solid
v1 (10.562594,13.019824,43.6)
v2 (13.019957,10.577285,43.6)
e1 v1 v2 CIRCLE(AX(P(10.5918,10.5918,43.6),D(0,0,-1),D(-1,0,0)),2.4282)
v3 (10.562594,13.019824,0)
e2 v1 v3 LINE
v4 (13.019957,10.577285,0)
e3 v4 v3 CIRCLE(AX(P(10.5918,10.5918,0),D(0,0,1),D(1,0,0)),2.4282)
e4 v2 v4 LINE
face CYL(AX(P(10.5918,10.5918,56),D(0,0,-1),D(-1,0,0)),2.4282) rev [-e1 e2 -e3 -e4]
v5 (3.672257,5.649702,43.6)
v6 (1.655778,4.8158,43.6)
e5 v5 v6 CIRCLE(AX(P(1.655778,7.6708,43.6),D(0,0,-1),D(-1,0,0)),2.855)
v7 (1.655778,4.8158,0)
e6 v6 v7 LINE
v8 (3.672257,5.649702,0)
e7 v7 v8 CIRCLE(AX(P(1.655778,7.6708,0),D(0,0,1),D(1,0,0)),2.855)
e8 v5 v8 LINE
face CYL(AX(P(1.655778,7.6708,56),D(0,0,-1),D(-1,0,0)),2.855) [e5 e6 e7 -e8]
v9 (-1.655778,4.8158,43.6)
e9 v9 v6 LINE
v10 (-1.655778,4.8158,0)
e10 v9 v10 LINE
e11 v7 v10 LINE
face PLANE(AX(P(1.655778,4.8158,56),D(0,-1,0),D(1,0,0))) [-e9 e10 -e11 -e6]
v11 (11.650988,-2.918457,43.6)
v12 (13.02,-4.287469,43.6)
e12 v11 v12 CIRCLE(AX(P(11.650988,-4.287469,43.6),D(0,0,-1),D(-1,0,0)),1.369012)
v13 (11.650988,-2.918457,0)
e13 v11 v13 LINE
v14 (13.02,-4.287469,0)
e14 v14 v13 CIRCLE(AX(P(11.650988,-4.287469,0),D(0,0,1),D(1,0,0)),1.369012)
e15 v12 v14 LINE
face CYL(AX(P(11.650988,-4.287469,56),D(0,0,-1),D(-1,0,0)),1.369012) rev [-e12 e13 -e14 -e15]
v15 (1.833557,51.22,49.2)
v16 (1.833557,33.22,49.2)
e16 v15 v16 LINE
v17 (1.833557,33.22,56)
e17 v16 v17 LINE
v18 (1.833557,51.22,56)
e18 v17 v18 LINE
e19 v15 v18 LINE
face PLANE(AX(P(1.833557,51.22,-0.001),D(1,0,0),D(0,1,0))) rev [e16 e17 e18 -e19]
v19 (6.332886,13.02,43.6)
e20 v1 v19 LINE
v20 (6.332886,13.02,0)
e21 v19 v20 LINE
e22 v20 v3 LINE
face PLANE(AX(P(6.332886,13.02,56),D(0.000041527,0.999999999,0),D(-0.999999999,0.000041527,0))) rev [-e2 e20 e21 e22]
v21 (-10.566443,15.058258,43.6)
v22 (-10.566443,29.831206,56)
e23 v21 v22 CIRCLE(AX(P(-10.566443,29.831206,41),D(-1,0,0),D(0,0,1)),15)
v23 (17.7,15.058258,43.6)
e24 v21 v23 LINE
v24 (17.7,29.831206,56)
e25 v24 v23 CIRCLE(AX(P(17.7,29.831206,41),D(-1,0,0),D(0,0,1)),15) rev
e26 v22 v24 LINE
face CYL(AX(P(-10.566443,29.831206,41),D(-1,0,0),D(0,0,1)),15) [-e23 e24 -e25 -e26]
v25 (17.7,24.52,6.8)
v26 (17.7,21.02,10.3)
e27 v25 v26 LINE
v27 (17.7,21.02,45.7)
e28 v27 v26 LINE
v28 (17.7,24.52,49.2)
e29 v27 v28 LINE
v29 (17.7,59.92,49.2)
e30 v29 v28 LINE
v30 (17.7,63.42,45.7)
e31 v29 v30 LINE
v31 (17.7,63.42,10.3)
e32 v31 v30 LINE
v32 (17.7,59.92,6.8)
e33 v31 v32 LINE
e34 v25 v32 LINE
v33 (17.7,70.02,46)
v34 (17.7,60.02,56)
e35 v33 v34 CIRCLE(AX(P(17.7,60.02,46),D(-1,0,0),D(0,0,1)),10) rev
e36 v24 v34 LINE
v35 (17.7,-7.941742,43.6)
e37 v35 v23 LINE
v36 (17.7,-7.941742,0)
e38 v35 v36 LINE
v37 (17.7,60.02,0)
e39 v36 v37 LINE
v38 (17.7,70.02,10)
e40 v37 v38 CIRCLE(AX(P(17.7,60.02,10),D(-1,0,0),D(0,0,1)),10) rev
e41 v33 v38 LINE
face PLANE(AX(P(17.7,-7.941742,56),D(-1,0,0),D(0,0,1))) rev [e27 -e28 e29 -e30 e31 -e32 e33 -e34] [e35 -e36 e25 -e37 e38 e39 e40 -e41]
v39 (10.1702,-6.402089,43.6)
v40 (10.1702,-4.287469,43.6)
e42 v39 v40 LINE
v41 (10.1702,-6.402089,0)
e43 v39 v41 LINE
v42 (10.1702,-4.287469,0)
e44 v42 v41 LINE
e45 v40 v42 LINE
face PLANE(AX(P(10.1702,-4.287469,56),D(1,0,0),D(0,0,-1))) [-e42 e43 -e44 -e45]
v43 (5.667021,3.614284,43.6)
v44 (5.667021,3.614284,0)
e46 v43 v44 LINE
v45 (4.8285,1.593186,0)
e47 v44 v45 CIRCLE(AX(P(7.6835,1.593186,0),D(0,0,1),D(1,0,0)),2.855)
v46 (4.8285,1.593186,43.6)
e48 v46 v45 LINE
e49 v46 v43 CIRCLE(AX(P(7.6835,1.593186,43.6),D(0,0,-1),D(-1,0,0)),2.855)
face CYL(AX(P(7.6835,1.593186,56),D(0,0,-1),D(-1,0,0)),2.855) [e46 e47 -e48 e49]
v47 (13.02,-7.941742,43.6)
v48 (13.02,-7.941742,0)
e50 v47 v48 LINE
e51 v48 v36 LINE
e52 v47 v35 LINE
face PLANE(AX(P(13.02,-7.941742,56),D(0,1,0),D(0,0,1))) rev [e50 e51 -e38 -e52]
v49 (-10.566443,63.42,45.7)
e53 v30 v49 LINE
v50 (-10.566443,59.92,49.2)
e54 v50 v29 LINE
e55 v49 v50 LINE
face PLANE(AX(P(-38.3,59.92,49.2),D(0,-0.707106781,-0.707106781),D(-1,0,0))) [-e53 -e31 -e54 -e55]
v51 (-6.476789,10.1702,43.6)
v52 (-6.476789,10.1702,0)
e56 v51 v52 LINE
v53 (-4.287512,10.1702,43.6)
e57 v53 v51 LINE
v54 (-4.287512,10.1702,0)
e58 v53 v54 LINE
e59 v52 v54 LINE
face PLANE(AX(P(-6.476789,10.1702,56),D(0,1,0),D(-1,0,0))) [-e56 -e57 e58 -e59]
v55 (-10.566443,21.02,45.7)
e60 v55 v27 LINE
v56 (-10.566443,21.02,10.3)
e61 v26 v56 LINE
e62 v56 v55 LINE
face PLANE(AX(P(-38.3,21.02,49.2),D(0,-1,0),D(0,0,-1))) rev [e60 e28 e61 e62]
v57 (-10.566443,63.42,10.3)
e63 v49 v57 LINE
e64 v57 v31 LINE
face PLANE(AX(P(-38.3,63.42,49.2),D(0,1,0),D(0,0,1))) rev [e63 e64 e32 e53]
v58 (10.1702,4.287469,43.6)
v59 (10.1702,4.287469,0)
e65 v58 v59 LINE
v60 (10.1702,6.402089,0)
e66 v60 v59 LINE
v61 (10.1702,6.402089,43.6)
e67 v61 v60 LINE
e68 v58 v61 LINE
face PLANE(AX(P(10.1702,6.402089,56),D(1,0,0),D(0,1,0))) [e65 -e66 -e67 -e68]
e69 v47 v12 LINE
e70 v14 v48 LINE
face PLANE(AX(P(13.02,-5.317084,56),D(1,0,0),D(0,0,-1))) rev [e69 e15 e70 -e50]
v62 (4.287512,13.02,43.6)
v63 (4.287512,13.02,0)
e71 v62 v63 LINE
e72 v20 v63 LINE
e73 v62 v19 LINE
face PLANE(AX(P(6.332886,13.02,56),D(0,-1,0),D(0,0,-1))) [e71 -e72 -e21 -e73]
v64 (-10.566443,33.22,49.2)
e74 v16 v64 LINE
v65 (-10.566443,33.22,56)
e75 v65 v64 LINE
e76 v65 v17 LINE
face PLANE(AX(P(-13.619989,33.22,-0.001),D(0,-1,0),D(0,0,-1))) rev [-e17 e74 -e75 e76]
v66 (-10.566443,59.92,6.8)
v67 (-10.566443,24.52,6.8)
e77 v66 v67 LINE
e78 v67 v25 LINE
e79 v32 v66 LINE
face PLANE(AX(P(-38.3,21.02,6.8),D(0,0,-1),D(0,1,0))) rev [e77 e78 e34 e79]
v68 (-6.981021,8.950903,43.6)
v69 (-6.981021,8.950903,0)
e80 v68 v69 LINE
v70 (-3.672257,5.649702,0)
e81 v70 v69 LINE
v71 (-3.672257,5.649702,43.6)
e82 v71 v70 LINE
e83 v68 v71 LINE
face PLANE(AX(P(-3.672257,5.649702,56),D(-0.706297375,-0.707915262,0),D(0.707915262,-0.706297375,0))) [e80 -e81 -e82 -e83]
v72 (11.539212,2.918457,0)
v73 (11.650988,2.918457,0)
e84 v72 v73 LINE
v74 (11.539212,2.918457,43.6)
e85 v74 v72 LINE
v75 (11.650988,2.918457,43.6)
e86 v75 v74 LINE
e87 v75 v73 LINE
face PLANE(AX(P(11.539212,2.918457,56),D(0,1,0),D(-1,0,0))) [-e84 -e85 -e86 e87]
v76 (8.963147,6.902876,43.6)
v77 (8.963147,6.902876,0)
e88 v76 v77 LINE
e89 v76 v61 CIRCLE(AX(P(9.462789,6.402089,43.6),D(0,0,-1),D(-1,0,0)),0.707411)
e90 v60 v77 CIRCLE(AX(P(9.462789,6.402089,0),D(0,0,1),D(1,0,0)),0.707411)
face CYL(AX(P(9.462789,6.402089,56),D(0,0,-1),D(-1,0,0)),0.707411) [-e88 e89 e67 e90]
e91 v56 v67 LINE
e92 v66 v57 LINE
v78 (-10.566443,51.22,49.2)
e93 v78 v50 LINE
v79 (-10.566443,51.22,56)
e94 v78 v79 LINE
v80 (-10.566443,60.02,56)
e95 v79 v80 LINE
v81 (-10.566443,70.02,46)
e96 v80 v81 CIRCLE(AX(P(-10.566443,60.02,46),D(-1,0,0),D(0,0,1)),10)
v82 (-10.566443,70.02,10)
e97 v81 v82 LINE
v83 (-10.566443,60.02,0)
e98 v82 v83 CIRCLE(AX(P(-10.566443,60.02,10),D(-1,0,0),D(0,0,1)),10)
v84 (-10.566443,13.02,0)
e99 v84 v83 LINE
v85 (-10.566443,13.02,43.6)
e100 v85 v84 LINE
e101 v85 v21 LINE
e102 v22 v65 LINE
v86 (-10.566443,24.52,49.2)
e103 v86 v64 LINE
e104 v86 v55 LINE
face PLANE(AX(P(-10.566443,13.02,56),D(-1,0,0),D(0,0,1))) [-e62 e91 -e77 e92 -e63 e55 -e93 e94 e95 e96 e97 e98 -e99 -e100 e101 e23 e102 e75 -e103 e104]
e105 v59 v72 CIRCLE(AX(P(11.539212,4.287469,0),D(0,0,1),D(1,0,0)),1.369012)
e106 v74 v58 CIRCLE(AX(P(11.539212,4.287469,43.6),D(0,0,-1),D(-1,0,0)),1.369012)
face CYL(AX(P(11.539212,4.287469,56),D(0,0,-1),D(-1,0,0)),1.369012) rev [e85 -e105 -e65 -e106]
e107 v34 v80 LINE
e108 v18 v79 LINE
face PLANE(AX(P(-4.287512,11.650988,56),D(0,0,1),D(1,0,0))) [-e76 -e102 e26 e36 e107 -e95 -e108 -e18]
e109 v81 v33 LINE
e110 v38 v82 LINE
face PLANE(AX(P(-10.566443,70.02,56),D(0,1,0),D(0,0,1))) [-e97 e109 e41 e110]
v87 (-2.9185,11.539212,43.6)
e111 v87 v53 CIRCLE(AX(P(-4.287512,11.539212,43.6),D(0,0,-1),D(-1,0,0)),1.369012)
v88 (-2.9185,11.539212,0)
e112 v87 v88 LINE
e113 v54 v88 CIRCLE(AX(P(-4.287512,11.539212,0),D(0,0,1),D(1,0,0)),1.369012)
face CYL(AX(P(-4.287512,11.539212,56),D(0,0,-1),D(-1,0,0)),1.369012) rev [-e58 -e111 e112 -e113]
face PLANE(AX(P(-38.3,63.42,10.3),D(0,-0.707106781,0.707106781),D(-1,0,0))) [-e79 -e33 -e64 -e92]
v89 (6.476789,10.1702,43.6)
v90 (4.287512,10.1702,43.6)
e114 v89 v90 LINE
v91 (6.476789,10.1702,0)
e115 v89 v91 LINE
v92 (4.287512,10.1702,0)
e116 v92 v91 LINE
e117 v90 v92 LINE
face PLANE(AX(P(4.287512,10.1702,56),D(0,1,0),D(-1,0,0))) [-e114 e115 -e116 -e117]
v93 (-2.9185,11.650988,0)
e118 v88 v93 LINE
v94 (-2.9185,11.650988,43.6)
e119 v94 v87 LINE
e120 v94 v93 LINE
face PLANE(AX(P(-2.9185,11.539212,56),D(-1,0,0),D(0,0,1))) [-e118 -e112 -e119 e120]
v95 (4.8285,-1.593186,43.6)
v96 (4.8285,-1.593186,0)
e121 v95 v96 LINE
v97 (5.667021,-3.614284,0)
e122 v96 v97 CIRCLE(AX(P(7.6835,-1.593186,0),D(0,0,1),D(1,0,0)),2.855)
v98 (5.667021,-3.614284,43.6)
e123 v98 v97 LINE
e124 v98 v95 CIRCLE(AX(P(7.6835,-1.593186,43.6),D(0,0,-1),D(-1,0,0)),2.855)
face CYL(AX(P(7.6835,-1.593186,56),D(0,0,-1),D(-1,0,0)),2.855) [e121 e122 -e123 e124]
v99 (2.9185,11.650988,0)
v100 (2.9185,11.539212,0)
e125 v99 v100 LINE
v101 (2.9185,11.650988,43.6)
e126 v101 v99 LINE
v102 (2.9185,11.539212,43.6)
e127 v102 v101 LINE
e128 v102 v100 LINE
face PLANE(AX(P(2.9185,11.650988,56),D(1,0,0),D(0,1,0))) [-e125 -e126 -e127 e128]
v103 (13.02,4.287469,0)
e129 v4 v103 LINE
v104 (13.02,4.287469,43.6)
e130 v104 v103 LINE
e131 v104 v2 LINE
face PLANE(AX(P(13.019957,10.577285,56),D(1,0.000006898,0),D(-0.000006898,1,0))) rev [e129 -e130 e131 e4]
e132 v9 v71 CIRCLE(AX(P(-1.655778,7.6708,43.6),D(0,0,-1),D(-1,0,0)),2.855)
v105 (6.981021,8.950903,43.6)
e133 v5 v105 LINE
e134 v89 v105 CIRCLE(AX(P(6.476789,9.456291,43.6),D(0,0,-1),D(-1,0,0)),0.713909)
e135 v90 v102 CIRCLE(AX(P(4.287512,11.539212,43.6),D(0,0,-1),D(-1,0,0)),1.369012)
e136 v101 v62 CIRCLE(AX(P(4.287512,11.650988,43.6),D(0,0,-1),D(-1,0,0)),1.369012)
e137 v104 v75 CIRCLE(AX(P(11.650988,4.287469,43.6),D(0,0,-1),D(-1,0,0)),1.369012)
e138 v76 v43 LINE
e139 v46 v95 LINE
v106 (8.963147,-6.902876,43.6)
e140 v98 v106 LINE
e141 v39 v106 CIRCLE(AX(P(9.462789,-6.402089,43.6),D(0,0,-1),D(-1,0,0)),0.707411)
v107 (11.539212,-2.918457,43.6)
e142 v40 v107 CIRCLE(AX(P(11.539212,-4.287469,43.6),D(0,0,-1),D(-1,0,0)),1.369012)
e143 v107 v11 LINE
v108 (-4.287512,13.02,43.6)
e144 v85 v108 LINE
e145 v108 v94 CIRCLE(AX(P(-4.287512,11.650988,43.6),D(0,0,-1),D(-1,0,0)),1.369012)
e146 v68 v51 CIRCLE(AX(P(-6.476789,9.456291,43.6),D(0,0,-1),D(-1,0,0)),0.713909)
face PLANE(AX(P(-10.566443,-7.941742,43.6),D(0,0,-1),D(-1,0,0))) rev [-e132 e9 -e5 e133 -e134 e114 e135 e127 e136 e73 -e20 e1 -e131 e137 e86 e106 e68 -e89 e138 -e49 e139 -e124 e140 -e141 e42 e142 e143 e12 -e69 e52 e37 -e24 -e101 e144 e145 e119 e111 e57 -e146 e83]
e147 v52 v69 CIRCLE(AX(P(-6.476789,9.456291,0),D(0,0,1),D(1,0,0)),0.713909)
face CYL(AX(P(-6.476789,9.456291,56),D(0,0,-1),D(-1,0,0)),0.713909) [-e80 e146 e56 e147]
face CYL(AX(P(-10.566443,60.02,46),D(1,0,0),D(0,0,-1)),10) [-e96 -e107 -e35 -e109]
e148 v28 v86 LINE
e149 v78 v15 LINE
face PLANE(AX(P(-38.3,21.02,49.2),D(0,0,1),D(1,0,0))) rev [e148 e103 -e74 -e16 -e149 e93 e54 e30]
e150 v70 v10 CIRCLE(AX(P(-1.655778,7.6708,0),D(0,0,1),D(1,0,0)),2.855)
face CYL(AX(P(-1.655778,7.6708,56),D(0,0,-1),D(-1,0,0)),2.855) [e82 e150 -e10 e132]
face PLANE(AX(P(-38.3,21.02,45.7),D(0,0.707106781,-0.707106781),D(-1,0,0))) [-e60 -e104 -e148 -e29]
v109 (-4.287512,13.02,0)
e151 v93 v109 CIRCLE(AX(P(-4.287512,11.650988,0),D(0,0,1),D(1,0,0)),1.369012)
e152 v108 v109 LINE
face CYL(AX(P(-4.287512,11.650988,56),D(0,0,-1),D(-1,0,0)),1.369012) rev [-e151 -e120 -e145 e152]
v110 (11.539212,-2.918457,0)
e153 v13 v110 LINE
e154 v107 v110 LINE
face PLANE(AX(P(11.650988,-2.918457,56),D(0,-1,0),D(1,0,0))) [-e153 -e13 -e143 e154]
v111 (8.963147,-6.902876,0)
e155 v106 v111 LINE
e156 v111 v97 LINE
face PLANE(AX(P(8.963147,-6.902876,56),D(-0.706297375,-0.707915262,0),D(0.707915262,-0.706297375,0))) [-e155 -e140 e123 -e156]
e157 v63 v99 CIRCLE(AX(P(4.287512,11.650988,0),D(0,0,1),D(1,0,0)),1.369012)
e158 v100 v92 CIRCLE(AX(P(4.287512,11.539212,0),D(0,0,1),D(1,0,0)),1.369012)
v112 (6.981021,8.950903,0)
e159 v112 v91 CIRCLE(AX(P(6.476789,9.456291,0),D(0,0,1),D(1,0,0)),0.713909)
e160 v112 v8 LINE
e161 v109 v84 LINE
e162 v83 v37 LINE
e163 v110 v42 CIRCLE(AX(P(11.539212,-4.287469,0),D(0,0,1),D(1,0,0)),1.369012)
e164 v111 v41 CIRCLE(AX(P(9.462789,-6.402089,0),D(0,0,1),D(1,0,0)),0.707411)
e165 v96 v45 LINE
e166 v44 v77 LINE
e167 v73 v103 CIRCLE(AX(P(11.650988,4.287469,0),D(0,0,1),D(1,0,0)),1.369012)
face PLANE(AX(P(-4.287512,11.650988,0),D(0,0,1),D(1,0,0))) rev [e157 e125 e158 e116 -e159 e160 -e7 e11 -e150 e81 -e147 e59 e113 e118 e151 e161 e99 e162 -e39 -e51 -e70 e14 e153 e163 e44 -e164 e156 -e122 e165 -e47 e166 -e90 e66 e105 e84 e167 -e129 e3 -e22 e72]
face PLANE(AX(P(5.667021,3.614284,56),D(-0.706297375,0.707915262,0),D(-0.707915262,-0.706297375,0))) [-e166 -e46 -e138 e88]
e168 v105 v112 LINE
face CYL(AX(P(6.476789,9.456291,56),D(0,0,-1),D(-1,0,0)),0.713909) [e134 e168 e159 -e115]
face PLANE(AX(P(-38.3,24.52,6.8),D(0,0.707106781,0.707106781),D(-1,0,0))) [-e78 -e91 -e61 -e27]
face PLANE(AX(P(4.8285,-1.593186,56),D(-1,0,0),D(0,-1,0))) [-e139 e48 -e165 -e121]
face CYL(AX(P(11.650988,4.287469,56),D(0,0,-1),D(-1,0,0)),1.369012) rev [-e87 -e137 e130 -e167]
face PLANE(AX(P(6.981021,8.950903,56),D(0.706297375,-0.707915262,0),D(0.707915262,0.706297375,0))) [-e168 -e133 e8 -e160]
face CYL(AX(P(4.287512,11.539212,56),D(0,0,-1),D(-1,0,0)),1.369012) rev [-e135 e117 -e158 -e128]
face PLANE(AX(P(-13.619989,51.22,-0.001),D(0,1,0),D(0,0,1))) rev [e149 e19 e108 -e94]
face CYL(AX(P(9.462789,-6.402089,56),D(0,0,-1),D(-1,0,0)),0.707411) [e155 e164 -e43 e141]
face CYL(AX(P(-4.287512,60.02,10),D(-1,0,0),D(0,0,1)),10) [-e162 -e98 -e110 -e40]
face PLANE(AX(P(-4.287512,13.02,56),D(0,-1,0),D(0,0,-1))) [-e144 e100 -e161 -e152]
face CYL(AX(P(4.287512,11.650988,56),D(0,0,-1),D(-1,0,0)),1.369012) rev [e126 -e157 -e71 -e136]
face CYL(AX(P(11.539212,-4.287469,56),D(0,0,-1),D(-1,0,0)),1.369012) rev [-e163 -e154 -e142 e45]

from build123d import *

# Parameters (mm, degrees)
BOSS_EXTRUDE1_DEPTH = 56
SKETCH14_W          = 42.4
SKETCH14_H          = 42.4
CUT_EXTRUDE1_DEPTH  = 56
CHAMFER1_SIZE       = 3.5
FILLET1_R           = 10
SKETCH16_W          = 12.4
SKETCH16_H          = 23
CUT_EXTRUDE3_DEPTH  = 95.009532523
CUT_EXTRUDE4_REACH  = 93.39
SKETCH17_W          = 15.453545708
SKETCH17_H          = 18
FILLET4_R           = 15


with BuildPart() as part:
    # Sketch1 → Boss-Extrude1 (new body)
    with BuildSketch(Plane.XY):
        with BuildLine():
            Line((13.02, -7.9417418), (17.7, -7.9417418))
            Line((17.7, -7.9417418), (17.7, 70.02))
            Line((17.7, 70.02), (-10.566443095, 70.02))
            Line((-10.566443095, 70.02), (-10.566443095, 13.02))
            Line((-10.566443095, 13.02), (-5.317126718, 13.02))
            Line((-5.317126718, 13.02), (-4.287512407, 13.02))
            ThreePointArc((-4.287512407, 13.02), (-3.319474451, 12.619025549), (-2.9185, 11.650987593))
            Line((-2.9185, 11.650987593), (-2.9185, 11.539212407))
            ThreePointArc((-2.9185, 11.539212407), (-3.319474451, 10.571174451), (-4.287512407, 10.1702))
            Line((-4.287512407, 10.1702), (-6.476788598, 10.1702))
            ThreePointArc((-6.476788598, 10.1702), (-7.136510935, 9.729114651), (-6.981020848, 8.950903446))
            Line((-6.981020848, 8.950903446), (-3.672257405, 5.649701928))
            ThreePointArc((-3.672257405, 5.649701928), (-2.746830644, 5.032499411), (-1.655778399, 4.8158))
            Line((-1.655778399, 4.8158), (1.655778399, 4.8158))
            ThreePointArc((1.655778399, 4.8158), (2.746830644, 5.032499411), (3.672257405, 5.649701928))
            Line((3.672257405, 5.649701928), (6.981020848, 8.950903446))
            ThreePointArc((6.981020848, 8.950903446), (7.136510935, 9.729114651), (6.476788598, 10.1702))
            Line((6.476788598, 10.1702), (4.287512407, 10.1702))
            ThreePointArc((4.287512407, 10.1702), (3.319474451, 10.571174451), (2.9185, 11.539212407))
            Line((2.9185, 11.539212407), (2.9185, 11.650987593))
            ThreePointArc((2.9185, 11.650987593), (3.319474451, 12.619025549), (4.287512407, 13.02))
            Line((4.287512407, 13.02), (6.332886163, 13.02))
            Line((6.332886163, 13.02), (10.562594215, 13.019824354))
            ThreePointArc((10.562594215, 13.019824354), (12.303594776, 12.313982883), (13.019956614, 10.577284622))
            Line((13.019956614, 10.577284622), (13.02, 4.287469289))
            ThreePointArc((13.02, 4.287469289), (12.619025549, 3.319431332), (11.650987593, 2.918456882))
            Line((11.650987593, 2.918456882), (11.539212407, 2.918456882))
            ThreePointArc((11.539212407, 2.918456882), (10.571174451, 3.319431332), (10.1702, 4.287469289))
            Line((10.1702, 4.287469289), (10.1702, 6.402089023))
            ThreePointArc((10.1702, 6.402089023), (9.733877283, 7.055496588), (8.963146507, 6.90287605))
            Line((8.963146507, 6.90287605), (5.667020993, 3.614283579))
            ThreePointArc((5.667020993, 3.614283579), (5.046449321, 2.687255303), (4.8285, 1.593185507))
            Line((4.8285, 1.593185507), (4.8285, -1.593185507))
            ThreePointArc((4.8285, -1.593185507), (5.046449321, -2.687255303), (5.667020993, -3.614283579))
            Line((5.667020993, -3.614283579), (8.963146507, -6.90287605))
            ThreePointArc((8.963146507, -6.90287605), (9.733877283, -7.055496588), (10.1702, -6.402089023))
            Line((10.1702, -6.402089023), (10.1702, -4.287469289))
            ThreePointArc((10.1702, -4.287469289), (10.571174451, -3.319431332), (11.539212407, -2.918456882))
            Line((11.539212407, -2.918456882), (11.650987593, -2.918456882))
            ThreePointArc((11.650987593, -2.918456882), (12.619025549, -3.319431332), (13.02, -4.287469289))
            Line((13.02, -4.287469289), (13.02, -5.3170836))
            Line((13.02, -5.3170836), (13.02, -7.9417418))
        make_face()
    extrude(amount=BOSS_EXTRUDE1_DEPTH)

    # Sketch14 → Cut-Extrude1 (cut)
    with BuildSketch(Plane(origin=(17.7, 0, 0), x_dir=(0, 0, -1), z_dir=(1, 0, 0))):
        with Locations((-28, 42.22)):
            Rectangle(SKETCH14_W, SKETCH14_H)
    extrude(amount=-CUT_EXTRUDE1_DEPTH, mode=Mode.SUBTRACT)

    # Chamfer1
    chamfer1_edges = [part.edges().sort_by_distance(p)[0] for p in [
        (3.566778452, 21.02, 49.2),
        (3.566778452, 63.42, 49.2),
        (3.566778452, 63.42, 6.8),
        (3.566778452, 21.02, 6.8),
    ]]
    chamfer(chamfer1_edges, length=CHAMFER1_SIZE)

    # Fillet1
    fillet1_edges = [part.edges().sort_by_distance(p)[0] for p in [
        (3.566778452, 70.02, 56),
        (3.566778452, 70.02, 0),
    ]]
    fillet(fillet1_edges, radius=FILLET1_R)

    # Sketch16 → Cut-Extrude3 (cut, through all)
    with BuildSketch(Plane(origin=(17.7, 0, 0), x_dir=(0, 0, -1), z_dir=(1, 0, 0))):
        with Locations((-49.8, 3.5582582)):
            Rectangle(SKETCH16_W, SKETCH16_H)
    extrude(amount=-CUT_EXTRUDE3_DEPTH, mode=Mode.SUBTRACT)

    # Sketch17 → Cut-Extrude4 (cut, up to next)
    with BuildSketch(Plane.XY.offset(56), mode=Mode.PRIVATE) as cut_extrude4_sk1:
        with Locations((-5.893215949, 42.22)):
            Rectangle(SKETCH17_W, SKETCH17_H)
    cut_extrude4_tool1 = extrude(cut_extrude4_sk1.sketch, amount=-CUT_EXTRUDE4_REACH, mode=Mode.PRIVATE) & part.part
    add(cut_extrude4_tool1.solids().sort_by_distance((-5.893216, 42.22, 56))[0], mode=Mode.SUBTRACT)

    # Fillet4
    # the kernel refuses this fillet: 15 mm, written as the material it takes off along each edge
    with BuildSketch(Plane(origin=(54.632370625, 15.0582582, 56), x_dir=(0, 1, 0), z_dir=(-1, 0, 0))) as fillet4_piece_1:
        with BuildLine():
            CenterArc((14.77294825, 15), FILLET4_R, 189.98168298, 80.01831702)
            Line((0, 12.4), (-0.295458965, 12.348))
            ThreePointArc((-0.295458965, 12.348), (-0.3, 6.2), (-0.3, 0))
            Line((-0.3, 0), (0, -0.3))
            Line((0, -0.3), (14.77294825, -0.3))
            Line((14.77294825, -0.3), (14.77294825, 0))
        make_face()
    extrude(amount=102.131184346, mode=Mode.SUBTRACT)


solid = part.part
